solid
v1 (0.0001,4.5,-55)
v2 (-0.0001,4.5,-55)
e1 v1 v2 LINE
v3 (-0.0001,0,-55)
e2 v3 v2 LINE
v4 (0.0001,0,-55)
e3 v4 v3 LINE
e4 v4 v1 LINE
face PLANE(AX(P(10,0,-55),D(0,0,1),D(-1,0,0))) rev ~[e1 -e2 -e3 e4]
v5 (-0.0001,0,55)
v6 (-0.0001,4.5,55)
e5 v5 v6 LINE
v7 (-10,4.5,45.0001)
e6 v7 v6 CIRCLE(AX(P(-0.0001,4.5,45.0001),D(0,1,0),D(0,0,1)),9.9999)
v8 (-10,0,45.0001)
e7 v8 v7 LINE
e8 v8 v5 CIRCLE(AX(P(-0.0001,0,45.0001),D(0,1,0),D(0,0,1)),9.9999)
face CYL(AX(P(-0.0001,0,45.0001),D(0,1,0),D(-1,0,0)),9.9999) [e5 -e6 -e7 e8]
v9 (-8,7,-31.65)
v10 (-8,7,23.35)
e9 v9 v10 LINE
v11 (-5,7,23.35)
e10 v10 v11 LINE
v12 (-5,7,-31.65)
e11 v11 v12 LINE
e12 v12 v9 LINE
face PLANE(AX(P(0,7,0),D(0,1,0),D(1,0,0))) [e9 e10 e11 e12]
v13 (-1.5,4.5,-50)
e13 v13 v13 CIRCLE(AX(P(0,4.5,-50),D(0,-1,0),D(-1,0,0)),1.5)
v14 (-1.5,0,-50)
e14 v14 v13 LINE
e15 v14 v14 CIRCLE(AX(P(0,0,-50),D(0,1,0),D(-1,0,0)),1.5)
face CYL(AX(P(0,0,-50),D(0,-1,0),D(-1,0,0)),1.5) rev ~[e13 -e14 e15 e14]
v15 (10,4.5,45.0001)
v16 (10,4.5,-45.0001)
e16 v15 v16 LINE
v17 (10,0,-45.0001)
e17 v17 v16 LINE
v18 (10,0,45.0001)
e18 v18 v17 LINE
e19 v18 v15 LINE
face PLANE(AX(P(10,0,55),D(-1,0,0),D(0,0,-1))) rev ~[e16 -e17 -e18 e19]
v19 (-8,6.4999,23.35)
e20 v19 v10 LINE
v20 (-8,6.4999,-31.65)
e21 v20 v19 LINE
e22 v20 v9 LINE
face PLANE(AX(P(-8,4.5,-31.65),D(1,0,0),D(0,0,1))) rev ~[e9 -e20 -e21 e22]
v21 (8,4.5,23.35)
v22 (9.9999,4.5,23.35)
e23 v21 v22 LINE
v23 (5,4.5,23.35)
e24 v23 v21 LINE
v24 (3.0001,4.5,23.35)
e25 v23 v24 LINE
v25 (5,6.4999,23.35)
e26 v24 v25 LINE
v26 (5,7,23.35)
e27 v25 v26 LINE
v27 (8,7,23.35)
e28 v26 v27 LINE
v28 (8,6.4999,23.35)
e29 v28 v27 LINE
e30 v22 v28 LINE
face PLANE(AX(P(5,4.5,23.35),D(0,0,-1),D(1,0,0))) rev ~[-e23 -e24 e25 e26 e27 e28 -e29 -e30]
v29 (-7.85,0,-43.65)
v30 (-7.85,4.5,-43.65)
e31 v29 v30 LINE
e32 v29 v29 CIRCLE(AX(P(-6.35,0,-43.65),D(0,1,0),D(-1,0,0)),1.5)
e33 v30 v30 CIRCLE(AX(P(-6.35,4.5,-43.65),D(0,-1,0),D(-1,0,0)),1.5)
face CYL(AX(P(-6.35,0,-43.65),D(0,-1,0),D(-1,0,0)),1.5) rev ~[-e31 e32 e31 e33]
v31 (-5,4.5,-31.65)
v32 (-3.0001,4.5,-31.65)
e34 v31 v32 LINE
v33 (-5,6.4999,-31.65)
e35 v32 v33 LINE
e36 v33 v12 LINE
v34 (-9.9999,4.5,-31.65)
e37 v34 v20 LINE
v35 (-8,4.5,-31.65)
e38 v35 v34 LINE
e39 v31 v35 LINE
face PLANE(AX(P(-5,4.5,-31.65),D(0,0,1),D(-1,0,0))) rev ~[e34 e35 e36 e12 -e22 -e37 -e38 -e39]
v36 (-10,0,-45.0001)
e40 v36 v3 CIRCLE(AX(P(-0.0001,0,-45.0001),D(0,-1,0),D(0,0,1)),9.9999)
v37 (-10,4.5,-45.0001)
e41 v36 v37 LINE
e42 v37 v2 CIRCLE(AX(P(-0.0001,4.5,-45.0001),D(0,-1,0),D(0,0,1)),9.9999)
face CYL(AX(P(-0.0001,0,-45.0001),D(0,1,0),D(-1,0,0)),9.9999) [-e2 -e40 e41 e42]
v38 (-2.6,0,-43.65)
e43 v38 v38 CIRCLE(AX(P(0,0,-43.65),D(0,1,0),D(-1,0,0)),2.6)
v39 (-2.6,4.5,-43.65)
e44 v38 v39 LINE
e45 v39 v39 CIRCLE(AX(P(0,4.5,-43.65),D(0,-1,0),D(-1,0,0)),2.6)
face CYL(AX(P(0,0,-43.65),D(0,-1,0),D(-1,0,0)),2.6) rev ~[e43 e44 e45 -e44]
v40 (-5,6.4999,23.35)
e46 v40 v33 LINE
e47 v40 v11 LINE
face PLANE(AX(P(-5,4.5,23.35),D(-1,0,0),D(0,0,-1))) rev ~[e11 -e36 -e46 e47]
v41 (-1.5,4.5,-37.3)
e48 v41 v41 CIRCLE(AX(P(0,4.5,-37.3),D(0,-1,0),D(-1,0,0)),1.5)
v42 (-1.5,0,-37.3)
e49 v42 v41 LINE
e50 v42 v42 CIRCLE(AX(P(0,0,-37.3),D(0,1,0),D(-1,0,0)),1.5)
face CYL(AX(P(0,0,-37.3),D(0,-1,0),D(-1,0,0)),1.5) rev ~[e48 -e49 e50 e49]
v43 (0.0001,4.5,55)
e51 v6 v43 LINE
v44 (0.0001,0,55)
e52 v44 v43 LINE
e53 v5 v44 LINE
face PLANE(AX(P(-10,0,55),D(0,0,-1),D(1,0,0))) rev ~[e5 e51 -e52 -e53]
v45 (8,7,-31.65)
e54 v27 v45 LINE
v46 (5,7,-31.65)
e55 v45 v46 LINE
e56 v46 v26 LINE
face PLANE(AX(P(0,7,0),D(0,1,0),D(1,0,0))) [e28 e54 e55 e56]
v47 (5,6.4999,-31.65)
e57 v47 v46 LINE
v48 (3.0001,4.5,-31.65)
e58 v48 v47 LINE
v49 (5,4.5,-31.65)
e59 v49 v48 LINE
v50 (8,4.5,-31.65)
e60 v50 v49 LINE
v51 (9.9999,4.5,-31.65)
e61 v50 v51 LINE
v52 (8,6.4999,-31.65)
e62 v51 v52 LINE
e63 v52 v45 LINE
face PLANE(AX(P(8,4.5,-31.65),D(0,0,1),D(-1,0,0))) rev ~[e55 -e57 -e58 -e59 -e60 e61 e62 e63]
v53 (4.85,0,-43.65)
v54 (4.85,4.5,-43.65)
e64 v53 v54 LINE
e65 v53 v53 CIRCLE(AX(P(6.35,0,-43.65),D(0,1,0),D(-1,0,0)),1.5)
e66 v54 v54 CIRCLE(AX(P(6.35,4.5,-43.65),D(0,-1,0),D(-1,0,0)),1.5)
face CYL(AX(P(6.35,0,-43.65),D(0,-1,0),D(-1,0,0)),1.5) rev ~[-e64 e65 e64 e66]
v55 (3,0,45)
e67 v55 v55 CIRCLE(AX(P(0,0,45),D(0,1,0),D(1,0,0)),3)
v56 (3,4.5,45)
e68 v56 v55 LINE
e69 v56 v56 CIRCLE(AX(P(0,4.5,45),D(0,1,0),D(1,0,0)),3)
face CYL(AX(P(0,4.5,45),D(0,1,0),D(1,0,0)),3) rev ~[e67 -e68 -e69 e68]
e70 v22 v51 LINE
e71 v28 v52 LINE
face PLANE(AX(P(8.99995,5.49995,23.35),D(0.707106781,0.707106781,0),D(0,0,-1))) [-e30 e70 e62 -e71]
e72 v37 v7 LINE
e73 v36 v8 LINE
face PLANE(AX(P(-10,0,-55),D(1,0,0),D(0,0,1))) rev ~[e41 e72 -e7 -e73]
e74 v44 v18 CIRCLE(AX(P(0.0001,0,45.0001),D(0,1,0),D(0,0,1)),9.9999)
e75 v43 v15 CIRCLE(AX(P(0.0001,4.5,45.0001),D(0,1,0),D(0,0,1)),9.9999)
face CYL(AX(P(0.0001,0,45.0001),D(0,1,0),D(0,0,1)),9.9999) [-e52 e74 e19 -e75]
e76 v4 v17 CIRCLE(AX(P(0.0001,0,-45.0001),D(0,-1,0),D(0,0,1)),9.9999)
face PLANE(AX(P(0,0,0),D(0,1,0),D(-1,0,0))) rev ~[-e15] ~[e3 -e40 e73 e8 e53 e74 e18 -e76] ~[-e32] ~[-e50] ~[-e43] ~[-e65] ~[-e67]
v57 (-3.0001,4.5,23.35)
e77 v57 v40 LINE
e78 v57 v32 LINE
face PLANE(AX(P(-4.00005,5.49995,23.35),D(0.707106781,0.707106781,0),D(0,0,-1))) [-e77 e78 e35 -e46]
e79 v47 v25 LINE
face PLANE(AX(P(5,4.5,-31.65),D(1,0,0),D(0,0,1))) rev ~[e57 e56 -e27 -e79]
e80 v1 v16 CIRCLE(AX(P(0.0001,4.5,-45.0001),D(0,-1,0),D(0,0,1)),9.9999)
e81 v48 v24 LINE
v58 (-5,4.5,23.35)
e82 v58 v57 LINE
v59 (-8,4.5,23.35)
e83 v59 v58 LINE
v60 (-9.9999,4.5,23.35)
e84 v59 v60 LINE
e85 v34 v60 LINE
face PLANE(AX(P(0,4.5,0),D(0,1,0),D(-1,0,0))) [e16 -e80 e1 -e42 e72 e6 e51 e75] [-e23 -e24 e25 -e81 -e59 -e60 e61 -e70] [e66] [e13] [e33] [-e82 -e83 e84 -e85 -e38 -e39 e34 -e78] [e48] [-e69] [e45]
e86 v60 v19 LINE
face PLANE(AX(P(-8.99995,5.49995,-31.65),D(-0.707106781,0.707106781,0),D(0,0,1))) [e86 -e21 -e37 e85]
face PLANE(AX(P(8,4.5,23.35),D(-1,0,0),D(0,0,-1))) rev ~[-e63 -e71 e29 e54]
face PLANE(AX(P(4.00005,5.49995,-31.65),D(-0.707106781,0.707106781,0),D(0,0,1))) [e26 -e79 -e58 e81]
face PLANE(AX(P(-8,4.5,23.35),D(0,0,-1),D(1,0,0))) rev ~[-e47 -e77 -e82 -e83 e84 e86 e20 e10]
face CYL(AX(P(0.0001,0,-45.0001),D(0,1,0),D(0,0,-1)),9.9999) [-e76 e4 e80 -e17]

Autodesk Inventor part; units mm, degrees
ref_plane "YZ Plane" through (0, 0, 0) normal (1, 0, 0) x (0, 1, 0)
ref_plane "XZ Plane" through (0, 0, 0) normal (0, 1, 0) x (-1, 0, 0)
ref_plane "XY Plane" through (0, 0, 0) normal (0, 0, 1) x (1, 0, 0)
sketch "Szkic1" plane through (0, 0, 0) normal (0, 1, 0) x (-1, 0, 0)
  line L0 (10, 55) -> (-10, 55)
  line L1 (-10, 55) -> (-10, -55)
  line L2 (-10, -55) -> (10, -55)
  line L3 (10, -55) -> (10, 55)
  line L4 (10, 55) -> (-10, -55) construction
  line L5 (-10, 55) -> (10, -55) construction
  circle A0 centre (0, -43.65) radius 2.6
  circle A1 centre (0, -37.3) radius 1.5
  circle A2 centre (0, -50) radius 1.5
  circle A3 centre (-6.35, -43.65) radius 1.5
  circle A4 centre (6.35, -43.65) radius 1.5
  line L6 (6.35, -43.65) -> (-6.35, -43.65)
  line L7 (0, -37.3) -> (0, -50)
  point P0 (0, 0)
  dimension "d0" = 20
  dimension "d1" = 110
  dimension "d2" = 5.2
  dimension "d3" = 3
  dimension "d4" = 3
  dimension "d5" = 6.35
  dimension "d6" = 6.35
  dimension "d7" = 5
  dimension "d22" = 3
  dimension "d23" = 3
  dimension "d24" = 6.35
  dimension "d25" = 6.35
  dimension "d26" = 8.9803
  dimension "d27" = 8.9803
  dimension "d28" = 3.65
extrude "Wyciągnięcie proste1" add sketch "Szkic1" along normal blind 4.5 contours L3 L2 L1 L0 | A3 | A4
sketch "Szkic3" plane through (0, 4.5, 0) normal (0, 1, 0) x (1, 0, 0)
  circle A0 centre (0, -45) radius 2.5 projected
  circle A1 centre (0, -45) radius 2.5
  point P0 (0, 0)
fillet "Zaokrąglenie1" radius 10 4 edges at (10, 2.25, -55) (-10, 2.25, -55) (10, 2.25, 55) (-10, 2.25, 55)
extrude "Wyciągnięcie proste4" cut sketch "Szkic3" against normal blind 10
sketch "Szkic4" plane through (0, 4.5, 0) normal (0, 1, 0) x (1, 0, 0)
  circle A0 centre (0, -45) radius 2.5 projected
  circle A1 centre (0, -45) radius 3
  point P0 (0, 0)
  dimension "d19" = 6
extrude "Wyciągnięcie proste5" cut sketch "Szkic4" against normal blind 10
extrude "Wyciągnięcie proste6" cut sketch "Szkic1" along normal blind 7 contours A3 | A4
sketch "Szkic5" plane through (0, 4.5, 0) normal (0, 1, 0) x (1, 0, 0)
  line L0 (-8, -23.35) -> (-5, -23.35)
  line L1 (-5, -23.35) -> (-5, 31.65)
  line L2 (-5, 31.65) -> (-8, 31.65)
  line L3 (-8, 31.65) -> (-8, -23.35)
  line L4 (5, -23.35) -> (8, -23.35)
  line L5 (8, -23.35) -> (8, 31.65)
  line L6 (8, 31.65) -> (5, 31.65)
  line L7 (5, 31.65) -> (5, -23.35)
  circle A0 centre (0, 43.65) radius 2.6 projected
  line L8 (10, -45) -> (10, 45) projected
  line L9 (-10, 45) -> (-10, -45) projected
  point P0 (0, 0)
  point P1 (6.5, 31.65)
  point P2 (6.5, -23.35)
  point P3 (-6.5, 31.65)
  point P4 (-6.5, -23.35)
  dimension "d31" = 55
  dimension "d32" = 55
  dimension "d33" = 67
  dimension "d34" = 3
  dimension "d35" = 3
  dimension "d36" = 2
  dimension "d37" = 2
extrude "Wyciągnięcie proste7" add sketch "Szkic5" along normal blind 2.5 contours L3 L2 L1 L0 | L7 L6 L5 L4
chamfer "Faza1" distance 2 angle 45 4 edges at (8, 4.5, -4.15) (-5, 4.5, -4.15) (-8, 4.5, -4.15) (5, 4.5, -4.15)
properties part number "link1_print_Drukowanie 3D"
